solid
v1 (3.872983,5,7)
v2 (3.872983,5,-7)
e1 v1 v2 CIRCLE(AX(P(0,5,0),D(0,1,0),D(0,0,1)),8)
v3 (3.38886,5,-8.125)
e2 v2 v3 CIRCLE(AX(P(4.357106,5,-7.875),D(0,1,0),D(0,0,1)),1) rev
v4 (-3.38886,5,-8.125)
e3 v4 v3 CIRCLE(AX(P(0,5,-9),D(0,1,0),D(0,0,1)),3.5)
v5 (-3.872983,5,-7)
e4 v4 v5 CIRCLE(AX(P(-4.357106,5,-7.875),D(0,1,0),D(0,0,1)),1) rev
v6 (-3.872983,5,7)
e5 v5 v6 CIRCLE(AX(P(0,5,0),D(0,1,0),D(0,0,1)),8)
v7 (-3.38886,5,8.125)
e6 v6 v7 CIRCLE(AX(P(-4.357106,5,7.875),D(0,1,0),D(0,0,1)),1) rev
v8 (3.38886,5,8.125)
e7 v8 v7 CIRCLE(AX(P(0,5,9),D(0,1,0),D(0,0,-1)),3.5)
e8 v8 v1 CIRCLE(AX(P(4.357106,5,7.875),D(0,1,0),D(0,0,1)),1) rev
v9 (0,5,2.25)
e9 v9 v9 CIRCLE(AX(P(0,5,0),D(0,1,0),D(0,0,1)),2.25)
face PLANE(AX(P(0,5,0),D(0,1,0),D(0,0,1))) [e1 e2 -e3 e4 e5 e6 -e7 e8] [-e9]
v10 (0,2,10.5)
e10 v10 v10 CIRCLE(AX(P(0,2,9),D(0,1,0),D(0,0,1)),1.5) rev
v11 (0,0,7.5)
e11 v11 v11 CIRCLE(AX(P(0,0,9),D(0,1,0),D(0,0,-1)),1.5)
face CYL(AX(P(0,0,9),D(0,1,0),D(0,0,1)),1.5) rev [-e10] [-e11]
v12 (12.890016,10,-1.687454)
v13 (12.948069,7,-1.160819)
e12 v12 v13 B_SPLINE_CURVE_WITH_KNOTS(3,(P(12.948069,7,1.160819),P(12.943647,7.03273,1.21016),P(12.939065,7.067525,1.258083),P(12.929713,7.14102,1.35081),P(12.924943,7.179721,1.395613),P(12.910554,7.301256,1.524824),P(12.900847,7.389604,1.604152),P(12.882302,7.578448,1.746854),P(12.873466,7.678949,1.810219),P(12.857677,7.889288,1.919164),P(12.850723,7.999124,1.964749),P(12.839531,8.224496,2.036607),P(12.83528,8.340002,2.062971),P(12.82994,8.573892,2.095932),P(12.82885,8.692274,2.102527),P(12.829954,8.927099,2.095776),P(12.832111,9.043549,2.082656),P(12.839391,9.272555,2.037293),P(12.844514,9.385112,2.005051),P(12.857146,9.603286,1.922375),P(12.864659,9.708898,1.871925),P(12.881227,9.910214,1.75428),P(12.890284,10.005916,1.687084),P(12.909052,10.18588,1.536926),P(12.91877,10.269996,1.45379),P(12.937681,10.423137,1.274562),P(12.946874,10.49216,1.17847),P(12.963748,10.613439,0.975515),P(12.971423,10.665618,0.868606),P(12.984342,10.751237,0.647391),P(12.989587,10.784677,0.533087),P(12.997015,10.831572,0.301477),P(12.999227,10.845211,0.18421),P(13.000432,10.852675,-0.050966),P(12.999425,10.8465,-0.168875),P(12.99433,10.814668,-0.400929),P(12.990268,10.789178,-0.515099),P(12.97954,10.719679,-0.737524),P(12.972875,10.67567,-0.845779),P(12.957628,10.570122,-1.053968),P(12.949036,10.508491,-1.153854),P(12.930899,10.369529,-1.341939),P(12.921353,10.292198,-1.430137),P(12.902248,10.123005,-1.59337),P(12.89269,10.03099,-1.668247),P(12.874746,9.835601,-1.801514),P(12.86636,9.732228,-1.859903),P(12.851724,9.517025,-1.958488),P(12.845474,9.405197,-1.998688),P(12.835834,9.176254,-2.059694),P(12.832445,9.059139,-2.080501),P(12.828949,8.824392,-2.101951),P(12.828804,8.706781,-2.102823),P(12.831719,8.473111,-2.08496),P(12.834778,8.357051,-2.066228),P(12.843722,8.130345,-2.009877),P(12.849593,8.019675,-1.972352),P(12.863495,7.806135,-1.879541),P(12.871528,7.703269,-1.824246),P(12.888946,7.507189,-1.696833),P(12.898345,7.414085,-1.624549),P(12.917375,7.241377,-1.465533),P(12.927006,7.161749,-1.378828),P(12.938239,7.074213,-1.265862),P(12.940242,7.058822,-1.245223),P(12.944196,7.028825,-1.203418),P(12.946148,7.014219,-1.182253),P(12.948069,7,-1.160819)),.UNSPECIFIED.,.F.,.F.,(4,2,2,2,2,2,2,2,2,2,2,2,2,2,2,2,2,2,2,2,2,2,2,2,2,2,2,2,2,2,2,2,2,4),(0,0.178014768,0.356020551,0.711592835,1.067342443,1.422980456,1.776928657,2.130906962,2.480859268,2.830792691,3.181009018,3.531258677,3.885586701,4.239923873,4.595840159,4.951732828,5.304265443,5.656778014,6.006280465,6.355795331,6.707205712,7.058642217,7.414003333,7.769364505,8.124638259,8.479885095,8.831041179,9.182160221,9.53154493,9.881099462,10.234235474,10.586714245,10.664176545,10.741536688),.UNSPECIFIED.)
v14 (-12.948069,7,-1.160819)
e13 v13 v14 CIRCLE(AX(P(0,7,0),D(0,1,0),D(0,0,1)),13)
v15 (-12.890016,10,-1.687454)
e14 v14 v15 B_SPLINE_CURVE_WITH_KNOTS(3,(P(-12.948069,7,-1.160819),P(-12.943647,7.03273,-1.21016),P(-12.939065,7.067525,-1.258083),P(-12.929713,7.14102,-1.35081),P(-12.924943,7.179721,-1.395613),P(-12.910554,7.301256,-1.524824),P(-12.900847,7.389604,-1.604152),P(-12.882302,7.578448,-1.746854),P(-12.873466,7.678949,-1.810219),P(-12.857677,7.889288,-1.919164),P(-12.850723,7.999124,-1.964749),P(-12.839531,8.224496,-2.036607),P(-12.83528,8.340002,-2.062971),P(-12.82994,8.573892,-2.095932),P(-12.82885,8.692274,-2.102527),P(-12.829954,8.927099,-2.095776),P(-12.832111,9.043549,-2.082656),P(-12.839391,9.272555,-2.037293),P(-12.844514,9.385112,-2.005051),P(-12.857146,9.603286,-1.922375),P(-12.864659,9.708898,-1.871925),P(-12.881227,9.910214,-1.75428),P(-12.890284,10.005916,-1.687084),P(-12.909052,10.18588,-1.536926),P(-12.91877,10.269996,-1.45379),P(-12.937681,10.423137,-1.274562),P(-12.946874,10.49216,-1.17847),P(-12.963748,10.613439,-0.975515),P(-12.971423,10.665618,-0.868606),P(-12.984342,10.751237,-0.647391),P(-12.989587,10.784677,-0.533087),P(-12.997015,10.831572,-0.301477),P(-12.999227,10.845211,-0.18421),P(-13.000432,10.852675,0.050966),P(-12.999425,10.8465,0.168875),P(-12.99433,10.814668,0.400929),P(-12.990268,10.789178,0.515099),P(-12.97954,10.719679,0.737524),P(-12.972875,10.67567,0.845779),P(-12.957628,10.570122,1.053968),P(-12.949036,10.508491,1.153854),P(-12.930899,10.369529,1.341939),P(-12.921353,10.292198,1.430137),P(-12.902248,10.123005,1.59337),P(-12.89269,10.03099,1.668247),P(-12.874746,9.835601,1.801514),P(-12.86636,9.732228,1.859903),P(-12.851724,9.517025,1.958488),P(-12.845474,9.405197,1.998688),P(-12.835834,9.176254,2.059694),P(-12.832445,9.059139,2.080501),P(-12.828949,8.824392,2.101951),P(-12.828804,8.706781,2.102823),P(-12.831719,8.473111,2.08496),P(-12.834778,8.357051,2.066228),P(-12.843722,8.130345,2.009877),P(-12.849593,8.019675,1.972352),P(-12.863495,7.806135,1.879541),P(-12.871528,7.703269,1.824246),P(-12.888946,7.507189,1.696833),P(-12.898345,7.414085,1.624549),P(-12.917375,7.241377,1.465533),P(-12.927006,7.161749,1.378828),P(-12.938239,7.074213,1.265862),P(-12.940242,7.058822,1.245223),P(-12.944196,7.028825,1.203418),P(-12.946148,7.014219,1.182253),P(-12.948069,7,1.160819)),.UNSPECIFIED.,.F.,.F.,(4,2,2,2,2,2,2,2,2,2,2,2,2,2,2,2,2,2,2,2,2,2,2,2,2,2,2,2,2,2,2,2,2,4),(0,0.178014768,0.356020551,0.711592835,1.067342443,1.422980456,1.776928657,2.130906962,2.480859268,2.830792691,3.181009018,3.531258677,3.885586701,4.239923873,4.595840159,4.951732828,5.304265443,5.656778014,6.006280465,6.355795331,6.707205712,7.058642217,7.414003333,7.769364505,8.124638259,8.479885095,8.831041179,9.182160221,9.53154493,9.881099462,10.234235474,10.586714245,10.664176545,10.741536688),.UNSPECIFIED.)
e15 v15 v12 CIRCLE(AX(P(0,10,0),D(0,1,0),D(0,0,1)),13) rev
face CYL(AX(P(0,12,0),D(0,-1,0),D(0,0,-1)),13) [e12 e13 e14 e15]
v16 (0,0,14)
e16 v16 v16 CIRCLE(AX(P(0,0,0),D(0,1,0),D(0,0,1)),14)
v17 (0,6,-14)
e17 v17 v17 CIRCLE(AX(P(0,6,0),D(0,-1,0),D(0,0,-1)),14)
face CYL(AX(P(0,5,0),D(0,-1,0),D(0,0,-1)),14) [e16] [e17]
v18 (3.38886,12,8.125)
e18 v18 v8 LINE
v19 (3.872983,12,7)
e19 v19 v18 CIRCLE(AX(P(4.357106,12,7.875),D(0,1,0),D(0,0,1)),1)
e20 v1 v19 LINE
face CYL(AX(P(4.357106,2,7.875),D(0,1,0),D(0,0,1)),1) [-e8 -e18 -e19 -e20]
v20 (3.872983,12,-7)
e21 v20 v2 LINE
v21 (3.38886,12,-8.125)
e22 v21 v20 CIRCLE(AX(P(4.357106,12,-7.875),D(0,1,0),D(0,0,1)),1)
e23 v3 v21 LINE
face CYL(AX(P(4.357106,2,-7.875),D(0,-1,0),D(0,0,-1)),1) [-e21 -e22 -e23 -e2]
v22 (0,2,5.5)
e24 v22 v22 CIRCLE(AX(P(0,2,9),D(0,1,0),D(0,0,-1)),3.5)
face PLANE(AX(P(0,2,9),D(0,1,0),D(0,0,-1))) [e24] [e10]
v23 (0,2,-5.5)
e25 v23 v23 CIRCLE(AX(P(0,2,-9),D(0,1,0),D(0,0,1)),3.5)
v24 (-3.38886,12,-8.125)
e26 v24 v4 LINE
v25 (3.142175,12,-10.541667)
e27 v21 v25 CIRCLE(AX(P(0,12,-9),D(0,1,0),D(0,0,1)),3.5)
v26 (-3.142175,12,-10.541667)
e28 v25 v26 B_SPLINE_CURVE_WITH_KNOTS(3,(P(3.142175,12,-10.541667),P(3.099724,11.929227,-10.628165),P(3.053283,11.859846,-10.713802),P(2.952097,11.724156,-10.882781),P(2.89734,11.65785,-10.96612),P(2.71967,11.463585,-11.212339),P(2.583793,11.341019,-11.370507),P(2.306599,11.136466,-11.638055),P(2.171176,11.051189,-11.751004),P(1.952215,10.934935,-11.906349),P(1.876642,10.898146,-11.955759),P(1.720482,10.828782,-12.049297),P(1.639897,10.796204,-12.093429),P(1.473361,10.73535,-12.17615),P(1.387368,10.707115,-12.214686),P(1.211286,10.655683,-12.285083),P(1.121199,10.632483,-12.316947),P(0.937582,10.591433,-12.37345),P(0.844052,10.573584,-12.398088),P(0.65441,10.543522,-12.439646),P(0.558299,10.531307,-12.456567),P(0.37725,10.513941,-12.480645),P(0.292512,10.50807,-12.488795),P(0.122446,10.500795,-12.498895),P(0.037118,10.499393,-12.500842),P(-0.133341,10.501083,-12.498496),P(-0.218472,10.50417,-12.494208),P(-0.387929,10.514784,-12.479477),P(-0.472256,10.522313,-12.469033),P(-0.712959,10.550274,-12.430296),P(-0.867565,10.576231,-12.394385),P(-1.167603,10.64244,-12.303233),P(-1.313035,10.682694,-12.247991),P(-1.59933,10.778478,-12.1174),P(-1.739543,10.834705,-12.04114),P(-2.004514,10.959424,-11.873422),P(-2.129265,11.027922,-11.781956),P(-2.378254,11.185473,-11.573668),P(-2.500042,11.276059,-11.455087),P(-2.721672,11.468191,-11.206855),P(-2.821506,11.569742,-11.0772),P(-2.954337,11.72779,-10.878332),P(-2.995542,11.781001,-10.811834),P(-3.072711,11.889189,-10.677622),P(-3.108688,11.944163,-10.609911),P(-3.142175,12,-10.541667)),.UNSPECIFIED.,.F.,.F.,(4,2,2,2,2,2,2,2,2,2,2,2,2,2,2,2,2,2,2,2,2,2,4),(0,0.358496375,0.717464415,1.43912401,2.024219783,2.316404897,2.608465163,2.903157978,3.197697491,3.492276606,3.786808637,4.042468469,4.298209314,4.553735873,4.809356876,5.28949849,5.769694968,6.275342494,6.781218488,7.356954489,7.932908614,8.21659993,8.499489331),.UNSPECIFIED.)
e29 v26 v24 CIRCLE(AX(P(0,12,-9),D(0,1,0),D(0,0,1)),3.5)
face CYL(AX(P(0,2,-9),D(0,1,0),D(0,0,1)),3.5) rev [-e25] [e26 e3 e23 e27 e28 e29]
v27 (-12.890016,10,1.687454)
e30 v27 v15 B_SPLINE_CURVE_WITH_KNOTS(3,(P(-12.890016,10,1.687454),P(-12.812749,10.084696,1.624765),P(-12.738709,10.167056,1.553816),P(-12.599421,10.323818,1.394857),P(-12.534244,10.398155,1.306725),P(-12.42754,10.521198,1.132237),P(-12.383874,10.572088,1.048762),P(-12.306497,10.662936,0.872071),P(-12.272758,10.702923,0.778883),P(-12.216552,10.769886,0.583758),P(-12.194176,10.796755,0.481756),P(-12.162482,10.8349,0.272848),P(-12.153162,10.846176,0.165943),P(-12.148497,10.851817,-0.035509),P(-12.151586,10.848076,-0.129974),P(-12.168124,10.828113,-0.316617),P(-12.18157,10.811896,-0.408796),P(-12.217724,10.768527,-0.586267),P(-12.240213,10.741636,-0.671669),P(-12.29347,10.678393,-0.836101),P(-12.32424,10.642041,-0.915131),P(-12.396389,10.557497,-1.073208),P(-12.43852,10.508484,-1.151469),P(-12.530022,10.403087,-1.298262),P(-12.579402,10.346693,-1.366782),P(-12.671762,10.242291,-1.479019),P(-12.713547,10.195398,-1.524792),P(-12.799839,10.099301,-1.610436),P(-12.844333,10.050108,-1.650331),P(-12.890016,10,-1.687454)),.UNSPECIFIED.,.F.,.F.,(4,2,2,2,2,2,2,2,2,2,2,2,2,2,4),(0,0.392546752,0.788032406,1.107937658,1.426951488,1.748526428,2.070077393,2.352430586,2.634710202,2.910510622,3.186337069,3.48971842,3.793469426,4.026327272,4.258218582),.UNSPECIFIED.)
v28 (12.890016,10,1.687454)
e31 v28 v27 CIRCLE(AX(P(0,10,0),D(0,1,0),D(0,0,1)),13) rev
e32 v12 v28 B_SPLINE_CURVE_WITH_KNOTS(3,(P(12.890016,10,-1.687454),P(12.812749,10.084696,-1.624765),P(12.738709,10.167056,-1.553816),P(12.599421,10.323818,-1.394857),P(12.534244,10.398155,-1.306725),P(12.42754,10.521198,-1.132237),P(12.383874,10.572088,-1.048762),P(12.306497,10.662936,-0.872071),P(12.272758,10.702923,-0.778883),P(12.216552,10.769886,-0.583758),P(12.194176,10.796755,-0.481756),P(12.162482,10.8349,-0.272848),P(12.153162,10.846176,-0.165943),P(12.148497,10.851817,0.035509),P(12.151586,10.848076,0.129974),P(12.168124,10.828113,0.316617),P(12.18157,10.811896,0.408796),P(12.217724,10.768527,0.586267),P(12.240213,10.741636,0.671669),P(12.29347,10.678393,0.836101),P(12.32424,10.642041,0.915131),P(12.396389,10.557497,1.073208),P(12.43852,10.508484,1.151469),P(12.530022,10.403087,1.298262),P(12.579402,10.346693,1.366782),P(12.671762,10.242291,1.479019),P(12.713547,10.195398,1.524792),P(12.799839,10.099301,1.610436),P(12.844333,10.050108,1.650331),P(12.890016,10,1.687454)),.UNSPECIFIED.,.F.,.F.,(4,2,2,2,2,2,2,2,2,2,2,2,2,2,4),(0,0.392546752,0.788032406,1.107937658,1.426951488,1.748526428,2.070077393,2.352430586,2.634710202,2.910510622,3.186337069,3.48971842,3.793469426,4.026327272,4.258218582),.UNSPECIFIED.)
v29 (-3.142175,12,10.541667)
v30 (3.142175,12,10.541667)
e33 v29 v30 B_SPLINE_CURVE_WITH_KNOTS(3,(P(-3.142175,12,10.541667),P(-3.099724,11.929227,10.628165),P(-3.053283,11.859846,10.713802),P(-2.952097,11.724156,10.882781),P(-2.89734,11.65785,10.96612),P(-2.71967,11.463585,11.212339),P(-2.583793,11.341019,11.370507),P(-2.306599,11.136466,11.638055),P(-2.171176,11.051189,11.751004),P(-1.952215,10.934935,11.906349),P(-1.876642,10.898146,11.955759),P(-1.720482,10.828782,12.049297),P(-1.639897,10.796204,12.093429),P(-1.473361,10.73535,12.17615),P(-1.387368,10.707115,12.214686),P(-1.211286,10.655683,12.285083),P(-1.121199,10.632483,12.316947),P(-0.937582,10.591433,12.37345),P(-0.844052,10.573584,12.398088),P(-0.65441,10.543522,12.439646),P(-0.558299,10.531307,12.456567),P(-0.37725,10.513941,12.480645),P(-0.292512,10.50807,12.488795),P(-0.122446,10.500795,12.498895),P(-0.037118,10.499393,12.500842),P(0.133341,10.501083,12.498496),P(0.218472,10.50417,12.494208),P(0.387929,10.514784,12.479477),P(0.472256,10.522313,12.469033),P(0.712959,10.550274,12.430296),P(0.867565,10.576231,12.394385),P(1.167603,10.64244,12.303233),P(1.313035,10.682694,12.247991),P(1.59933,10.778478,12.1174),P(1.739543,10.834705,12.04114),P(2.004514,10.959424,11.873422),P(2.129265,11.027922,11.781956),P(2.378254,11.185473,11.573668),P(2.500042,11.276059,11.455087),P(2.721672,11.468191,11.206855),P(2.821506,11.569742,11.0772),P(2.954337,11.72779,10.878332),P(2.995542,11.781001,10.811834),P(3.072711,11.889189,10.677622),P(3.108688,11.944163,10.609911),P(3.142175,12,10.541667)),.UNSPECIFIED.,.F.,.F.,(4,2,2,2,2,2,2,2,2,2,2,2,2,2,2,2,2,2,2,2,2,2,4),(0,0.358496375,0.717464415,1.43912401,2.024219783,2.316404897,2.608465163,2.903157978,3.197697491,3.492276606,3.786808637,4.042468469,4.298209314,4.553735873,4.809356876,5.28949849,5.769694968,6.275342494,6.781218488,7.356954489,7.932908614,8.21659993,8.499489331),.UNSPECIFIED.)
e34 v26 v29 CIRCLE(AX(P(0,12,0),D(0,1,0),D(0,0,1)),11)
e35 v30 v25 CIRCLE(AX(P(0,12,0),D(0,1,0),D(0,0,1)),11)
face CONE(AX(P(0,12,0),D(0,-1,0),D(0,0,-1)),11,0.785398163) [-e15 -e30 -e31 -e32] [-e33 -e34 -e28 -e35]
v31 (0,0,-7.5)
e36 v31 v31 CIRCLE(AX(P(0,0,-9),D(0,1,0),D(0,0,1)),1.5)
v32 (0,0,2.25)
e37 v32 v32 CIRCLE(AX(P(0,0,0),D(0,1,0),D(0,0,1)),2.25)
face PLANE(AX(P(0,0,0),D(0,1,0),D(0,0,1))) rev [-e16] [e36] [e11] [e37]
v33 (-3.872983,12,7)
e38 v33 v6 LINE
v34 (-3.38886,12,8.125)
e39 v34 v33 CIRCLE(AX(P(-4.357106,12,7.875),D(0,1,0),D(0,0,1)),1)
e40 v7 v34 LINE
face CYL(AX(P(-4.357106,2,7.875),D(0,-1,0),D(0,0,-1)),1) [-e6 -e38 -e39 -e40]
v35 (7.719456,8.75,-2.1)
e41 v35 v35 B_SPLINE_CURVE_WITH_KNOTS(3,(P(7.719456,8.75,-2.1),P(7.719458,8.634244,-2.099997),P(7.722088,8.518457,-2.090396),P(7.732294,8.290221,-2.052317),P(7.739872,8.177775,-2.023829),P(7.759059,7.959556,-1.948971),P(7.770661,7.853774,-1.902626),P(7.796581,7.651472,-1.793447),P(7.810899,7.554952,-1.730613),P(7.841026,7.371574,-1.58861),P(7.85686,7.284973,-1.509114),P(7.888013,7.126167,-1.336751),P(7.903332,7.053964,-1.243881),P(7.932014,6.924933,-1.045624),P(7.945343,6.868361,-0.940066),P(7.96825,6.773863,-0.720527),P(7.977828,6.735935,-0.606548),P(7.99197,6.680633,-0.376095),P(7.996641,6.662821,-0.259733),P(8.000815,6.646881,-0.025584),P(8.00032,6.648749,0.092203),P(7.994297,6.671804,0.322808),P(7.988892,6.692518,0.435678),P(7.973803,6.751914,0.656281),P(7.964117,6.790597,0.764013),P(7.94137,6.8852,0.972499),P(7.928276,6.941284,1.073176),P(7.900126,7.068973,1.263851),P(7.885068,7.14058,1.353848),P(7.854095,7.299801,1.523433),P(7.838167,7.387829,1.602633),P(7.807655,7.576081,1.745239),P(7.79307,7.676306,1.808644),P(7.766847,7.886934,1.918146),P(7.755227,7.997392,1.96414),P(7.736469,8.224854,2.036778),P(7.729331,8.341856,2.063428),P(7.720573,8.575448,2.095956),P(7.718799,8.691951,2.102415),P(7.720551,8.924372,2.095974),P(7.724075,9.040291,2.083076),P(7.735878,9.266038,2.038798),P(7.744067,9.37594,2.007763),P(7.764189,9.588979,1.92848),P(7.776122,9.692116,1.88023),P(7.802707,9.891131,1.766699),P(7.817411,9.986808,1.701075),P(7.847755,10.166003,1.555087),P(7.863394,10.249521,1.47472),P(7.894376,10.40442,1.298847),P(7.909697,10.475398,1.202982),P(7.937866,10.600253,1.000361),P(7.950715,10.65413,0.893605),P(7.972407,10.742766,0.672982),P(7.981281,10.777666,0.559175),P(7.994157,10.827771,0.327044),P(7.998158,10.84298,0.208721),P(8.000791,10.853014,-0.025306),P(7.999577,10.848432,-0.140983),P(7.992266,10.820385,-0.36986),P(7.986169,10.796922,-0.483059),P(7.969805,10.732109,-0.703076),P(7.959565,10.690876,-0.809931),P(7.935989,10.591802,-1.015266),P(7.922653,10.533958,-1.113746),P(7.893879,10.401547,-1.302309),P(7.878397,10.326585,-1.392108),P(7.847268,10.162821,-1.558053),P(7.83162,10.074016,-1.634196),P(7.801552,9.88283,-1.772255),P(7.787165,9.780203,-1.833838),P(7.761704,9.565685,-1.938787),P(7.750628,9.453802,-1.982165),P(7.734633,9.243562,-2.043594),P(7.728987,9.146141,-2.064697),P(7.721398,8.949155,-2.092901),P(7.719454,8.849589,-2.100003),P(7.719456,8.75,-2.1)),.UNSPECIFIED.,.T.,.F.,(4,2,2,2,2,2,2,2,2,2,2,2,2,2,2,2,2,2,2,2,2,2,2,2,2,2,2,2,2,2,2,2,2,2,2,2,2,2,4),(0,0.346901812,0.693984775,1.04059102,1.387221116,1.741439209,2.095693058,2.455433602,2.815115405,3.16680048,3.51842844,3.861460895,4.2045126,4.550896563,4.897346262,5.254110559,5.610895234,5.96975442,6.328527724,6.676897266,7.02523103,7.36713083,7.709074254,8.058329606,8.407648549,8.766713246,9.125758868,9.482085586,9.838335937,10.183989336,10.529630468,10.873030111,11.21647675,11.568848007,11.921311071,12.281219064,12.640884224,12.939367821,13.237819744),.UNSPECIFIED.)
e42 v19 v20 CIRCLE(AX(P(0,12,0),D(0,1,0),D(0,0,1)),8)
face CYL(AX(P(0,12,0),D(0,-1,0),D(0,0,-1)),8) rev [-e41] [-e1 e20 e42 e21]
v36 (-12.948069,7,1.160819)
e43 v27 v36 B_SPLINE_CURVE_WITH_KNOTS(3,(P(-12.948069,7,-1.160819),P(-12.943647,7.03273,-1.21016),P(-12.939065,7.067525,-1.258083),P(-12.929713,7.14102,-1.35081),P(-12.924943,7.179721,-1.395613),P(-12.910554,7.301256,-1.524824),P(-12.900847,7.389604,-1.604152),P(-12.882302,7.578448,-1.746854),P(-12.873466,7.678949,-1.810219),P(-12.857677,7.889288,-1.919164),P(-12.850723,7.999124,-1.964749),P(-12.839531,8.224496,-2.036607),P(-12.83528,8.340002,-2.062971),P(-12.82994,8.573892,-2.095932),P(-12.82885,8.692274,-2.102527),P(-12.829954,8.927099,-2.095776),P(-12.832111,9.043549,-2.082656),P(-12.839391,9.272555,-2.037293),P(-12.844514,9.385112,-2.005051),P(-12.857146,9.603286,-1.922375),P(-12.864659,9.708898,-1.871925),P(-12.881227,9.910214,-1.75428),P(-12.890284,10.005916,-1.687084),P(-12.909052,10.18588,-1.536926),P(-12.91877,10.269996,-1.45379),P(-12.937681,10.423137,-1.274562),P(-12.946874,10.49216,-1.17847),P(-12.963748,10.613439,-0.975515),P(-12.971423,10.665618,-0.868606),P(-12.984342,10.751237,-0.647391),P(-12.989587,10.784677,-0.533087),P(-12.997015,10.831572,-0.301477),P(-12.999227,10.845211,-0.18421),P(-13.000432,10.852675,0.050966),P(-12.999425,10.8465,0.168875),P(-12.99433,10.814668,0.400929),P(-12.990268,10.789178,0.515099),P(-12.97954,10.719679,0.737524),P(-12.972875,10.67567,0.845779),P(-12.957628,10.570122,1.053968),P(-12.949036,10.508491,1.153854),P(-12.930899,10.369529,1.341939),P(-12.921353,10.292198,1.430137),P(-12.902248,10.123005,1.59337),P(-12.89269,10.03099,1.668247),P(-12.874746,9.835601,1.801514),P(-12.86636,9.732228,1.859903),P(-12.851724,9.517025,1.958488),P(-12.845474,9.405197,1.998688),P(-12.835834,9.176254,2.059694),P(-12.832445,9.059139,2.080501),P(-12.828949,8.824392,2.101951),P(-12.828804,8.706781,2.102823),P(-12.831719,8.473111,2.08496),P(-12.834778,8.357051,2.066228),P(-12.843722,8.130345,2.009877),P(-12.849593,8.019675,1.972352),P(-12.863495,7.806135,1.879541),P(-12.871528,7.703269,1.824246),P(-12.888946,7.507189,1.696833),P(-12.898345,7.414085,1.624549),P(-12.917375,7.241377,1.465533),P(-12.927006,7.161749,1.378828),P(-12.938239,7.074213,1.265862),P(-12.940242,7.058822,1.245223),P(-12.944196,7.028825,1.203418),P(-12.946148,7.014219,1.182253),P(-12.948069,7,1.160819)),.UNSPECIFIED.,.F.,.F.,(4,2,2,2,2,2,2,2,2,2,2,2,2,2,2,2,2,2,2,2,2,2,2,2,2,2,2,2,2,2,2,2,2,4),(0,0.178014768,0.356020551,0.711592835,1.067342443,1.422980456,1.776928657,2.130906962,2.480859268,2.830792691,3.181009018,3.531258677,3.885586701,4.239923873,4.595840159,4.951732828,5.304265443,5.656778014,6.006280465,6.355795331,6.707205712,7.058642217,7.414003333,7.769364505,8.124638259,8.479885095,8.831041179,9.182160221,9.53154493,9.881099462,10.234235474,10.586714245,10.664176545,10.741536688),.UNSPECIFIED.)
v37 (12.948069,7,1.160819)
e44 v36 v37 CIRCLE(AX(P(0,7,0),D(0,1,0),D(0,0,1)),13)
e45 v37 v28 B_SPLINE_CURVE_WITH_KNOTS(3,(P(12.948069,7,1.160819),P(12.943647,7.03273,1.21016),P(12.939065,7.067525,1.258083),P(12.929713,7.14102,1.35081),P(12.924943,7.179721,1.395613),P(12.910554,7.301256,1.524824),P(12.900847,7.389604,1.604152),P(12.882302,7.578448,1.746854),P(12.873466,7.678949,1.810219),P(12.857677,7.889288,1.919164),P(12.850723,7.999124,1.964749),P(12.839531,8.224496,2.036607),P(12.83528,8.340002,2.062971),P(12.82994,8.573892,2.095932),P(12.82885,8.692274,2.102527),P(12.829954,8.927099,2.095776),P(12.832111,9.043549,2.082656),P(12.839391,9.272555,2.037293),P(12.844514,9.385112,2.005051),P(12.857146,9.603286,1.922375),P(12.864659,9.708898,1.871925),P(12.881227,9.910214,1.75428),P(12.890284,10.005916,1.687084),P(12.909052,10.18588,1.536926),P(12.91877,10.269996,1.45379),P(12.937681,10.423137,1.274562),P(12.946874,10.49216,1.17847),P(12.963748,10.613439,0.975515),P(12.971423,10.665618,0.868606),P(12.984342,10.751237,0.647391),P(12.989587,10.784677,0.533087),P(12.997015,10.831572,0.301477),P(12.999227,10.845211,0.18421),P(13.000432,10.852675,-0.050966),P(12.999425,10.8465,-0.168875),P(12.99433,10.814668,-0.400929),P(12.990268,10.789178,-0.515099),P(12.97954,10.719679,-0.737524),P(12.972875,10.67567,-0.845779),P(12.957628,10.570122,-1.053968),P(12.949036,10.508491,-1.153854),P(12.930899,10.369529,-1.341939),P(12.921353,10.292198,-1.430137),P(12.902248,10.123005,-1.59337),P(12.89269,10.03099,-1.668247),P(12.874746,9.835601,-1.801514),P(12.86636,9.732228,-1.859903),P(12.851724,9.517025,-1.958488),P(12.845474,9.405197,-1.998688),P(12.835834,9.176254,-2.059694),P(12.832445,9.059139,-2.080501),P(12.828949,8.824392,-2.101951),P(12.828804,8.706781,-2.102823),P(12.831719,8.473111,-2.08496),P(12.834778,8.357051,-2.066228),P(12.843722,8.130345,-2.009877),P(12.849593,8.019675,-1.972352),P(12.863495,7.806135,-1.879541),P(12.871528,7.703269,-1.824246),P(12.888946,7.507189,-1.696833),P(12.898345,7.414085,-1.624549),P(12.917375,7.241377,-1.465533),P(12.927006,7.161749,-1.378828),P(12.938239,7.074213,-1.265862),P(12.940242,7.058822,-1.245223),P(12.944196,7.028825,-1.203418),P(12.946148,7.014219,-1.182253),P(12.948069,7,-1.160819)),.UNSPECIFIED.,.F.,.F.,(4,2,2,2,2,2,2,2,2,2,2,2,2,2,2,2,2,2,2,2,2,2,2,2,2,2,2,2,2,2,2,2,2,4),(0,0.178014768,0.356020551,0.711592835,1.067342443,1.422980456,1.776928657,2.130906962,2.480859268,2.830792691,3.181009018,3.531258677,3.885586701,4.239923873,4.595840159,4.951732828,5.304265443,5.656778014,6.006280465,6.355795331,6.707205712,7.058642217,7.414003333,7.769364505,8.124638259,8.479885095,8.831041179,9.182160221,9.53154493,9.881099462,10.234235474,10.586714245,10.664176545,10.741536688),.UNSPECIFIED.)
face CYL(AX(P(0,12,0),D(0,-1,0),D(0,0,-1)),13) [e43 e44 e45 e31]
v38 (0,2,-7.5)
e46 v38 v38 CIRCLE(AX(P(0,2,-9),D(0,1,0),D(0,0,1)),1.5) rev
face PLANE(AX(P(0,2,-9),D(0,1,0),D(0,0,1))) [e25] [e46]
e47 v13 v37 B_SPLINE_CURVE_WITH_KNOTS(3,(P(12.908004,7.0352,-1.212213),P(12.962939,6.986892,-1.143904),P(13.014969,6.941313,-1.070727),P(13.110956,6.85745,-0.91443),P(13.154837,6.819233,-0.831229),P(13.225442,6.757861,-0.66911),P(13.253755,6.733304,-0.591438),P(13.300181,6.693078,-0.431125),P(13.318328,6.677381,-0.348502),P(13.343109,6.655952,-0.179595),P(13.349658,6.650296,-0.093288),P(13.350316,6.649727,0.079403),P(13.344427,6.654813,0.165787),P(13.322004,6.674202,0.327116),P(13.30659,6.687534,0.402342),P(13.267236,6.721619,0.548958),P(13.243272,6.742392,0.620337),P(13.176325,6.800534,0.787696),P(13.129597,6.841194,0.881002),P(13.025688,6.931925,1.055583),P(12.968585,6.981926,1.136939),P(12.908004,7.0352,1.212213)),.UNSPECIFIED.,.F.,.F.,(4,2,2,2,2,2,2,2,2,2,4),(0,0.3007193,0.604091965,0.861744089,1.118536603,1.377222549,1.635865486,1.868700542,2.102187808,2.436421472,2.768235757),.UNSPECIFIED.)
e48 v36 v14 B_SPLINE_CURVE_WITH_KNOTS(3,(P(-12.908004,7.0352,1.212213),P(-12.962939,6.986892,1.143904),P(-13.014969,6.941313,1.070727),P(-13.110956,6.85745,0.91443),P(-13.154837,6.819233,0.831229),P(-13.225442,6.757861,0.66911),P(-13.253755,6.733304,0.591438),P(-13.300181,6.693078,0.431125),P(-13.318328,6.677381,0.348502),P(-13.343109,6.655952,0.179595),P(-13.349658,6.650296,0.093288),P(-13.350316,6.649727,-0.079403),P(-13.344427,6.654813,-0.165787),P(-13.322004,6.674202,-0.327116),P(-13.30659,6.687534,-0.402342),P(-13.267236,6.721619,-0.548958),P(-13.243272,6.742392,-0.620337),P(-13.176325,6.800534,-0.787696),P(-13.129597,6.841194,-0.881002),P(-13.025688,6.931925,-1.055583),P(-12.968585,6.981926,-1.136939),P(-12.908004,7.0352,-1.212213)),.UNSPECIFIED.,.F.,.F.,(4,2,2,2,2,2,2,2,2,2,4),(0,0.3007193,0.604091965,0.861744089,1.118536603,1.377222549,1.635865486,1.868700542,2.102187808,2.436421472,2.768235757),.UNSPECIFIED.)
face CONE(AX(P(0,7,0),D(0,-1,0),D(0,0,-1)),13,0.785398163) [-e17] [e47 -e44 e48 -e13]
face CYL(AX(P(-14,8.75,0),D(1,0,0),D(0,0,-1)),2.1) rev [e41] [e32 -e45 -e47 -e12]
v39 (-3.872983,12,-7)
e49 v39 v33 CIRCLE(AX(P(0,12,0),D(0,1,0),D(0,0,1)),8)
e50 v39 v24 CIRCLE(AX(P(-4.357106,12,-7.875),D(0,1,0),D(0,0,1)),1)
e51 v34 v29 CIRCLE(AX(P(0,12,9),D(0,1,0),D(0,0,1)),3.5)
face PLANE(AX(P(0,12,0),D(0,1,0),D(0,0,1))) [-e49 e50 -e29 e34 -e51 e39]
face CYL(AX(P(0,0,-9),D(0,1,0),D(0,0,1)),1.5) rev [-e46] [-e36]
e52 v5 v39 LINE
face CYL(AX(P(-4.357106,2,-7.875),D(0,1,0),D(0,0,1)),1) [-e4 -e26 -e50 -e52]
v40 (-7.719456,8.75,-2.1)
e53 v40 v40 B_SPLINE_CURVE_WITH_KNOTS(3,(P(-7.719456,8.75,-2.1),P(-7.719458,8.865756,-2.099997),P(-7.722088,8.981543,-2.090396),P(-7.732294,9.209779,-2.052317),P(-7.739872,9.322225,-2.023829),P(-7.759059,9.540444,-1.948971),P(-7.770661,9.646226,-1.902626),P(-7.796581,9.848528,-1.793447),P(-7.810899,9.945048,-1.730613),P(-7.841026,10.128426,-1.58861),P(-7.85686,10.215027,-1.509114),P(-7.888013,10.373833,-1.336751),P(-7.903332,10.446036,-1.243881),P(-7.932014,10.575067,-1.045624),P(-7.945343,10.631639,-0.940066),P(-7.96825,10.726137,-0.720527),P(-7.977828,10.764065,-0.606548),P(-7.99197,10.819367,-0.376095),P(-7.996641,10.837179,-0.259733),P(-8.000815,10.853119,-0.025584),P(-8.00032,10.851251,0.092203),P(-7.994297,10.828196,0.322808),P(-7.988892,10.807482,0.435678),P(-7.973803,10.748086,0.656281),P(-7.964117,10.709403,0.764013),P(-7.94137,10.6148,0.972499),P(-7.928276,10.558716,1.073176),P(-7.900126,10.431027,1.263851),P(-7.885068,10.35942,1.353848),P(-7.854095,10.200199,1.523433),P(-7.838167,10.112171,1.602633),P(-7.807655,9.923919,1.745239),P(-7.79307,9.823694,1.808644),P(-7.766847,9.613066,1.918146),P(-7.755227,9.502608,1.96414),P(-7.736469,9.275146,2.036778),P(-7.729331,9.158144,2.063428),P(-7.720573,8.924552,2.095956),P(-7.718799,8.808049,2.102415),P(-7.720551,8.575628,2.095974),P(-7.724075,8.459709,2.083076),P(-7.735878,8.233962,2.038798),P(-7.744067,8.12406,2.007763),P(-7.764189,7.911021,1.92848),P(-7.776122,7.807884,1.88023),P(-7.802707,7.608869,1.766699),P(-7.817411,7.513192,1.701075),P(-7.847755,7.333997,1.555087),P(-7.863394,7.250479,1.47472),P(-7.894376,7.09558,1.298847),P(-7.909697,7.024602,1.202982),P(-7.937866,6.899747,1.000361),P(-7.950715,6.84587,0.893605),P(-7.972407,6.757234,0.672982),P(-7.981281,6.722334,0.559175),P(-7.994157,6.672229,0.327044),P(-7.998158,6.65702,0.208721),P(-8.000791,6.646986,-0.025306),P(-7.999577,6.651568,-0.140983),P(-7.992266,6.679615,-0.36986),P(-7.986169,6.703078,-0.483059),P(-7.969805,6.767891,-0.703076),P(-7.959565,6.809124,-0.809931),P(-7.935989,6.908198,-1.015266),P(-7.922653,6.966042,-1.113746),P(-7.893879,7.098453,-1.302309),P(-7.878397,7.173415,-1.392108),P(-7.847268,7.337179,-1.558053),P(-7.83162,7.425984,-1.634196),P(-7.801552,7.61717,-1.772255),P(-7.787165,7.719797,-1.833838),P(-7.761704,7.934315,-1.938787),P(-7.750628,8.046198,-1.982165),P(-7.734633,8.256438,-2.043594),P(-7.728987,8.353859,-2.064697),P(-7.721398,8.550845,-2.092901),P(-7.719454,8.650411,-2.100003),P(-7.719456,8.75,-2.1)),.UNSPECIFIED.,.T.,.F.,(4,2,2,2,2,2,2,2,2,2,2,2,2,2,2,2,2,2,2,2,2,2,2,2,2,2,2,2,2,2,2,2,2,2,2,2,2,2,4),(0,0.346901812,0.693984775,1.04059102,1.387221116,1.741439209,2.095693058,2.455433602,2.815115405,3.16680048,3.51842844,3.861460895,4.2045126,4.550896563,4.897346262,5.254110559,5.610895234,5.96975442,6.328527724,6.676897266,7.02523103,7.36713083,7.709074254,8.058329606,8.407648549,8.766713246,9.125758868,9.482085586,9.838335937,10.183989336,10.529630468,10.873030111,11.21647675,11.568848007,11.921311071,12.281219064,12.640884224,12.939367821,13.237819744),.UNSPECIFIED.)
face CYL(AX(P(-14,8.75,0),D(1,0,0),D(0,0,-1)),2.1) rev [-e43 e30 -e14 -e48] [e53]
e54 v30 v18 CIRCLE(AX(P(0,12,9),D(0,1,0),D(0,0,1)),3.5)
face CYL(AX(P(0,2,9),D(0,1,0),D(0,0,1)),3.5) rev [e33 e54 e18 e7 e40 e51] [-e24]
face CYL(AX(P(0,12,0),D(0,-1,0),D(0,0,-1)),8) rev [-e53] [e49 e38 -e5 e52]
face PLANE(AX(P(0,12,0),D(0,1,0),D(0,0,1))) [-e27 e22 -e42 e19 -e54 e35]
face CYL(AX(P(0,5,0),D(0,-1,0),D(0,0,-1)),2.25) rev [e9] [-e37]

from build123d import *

# Parameters (mm, degrees)
SKETCH1_R               = 14
SKETCH1_R_2             = 2.25
BOSS_EXTRUDE1_DEPTH     = 5
SKETCH2_R               = 1.5
CUT_EXTRUDE1_DEPTH      = 21.420577857
SKETCH4_R               = 3.5
CUT_EXTRUDE2_DEPTH      = 3
CIRPATTERN1_COUNT       = 2
SKETCH5_R               = 13
SKETCH5_R_2             = 8
BOSS_EXTRUDE2_DEPTH     = 7
SKETCH6_R               = 3.5
CUT_EXTRUDE3_DEPTH      = 22
CHAMFER1_SIZE           = 2
FILLET1_START           = 5
FILLET1_DEPTH           = 8
CUT_EXTRUDE4_DEPTH      = 24.151673806
CUT_EXTRUDE4_DEPTH_BACK = 24.151673806
SKETCH8_R               = 2.1
CHAMFER2_SIZE           = 2


with BuildPart() as part:
    # Sketch1 → Boss-Extrude1 (new body)
    with BuildSketch(Plane(origin=(0, 0, 0), x_dir=(1, 0, 0), z_dir=(0, 1, 0))):
        with Locations(Location((0, 0, 0), (0, 0, 270))):
            Circle(SKETCH1_R)
        with Locations(Location((0, 0, 0), (0, 0, 270))):
            Circle(SKETCH1_R_2, mode=Mode.SUBTRACT)
    extrude(amount=BOSS_EXTRUDE1_DEPTH)

    # Sketch2 → Cut-Extrude1 (cut, through all)
    with BuildSketch(Plane(origin=(0, 5, 0), x_dir=(1, 0, 0), z_dir=(0, 1, 0))):
        with Locations(Location((0, 9, 0), (0, 0, 270))):
            Circle(SKETCH2_R)
    cut_extrude1 = extrude(amount=-CUT_EXTRUDE1_DEPTH, mode=Mode.SUBTRACT)

    # Sketch4 → Cut-Extrude2 (cut)
    with BuildSketch(Plane(origin=(0, 5, 0), x_dir=(1, 0, 0), z_dir=(0, 1, 0))):
        with Locations(Location((0, 9, 0), (0, 0, 270))):
            Circle(SKETCH4_R)
    cut_extrude2 = extrude(amount=-CUT_EXTRUDE2_DEPTH, mode=Mode.SUBTRACT)

    # CirPattern1: Cut-Extrude1, Cut-Extrude2 ×2 about axis
    cirpattern1_axis = Axis((0, 0, 0), (0, 1, 0))
    add([cut_extrude1.rotate(cirpattern1_axis, i * 360 / CIRPATTERN1_COUNT) for i in range(1, CIRPATTERN1_COUNT)], mode=Mode.SUBTRACT)
    add([cut_extrude2.rotate(cirpattern1_axis, i * 360 / CIRPATTERN1_COUNT) for i in range(1, CIRPATTERN1_COUNT)], mode=Mode.SUBTRACT)

    # Sketch5 → Boss-Extrude2 (add)
    with BuildSketch(Plane(origin=(0, 5, 0), x_dir=(1, 0, 0), z_dir=(0, 1, 0))):
        with Locations(Location((0, 0, 0), (0, 0, 270))):
            Circle(SKETCH5_R)
        with Locations(Location((0, 0, 0), (0, 0, 112.7982481))):
            Circle(SKETCH5_R_2, mode=Mode.SUBTRACT)
    extrude(amount=BOSS_EXTRUDE2_DEPTH)

    # Sketch6 → Cut-Extrude3 (cut, through all)
    with BuildSketch(Plane(origin=(0, 5, 0), x_dir=(1, 0, 0), z_dir=(0, 1, 0))):
        with Locations(Location((0, 9, 0), (0, 0, 270))):
            Circle(SKETCH6_R)
        with Locations(Location((0, -9, 0), (0, 0, 27.664004496))):
            Circle(SKETCH6_R)
    extrude(amount=CUT_EXTRUDE3_DEPTH, mode=Mode.SUBTRACT)

    # Chamfer1
    # the kernel refuses this chamfer: 2 mm, written as the material it adds along each edge
    with BuildSketch(Plane(origin=(0, 5, 0), x_dir=(0, 0, 1), z_dir=(-1, 0, 0))) as chamfer1_piece_1_section:
        Polygon((13 + CHAMFER1_SIZE, 0), (13, CHAMFER1_SIZE), (13, 0), align=None)
    chamfer1_piece_1 = revolve(axis=Axis((0, 5, 0), (0, 1, 0)), mode=Mode.PRIVATE)
    chamfer1_piece_1 = chamfer1_piece_1 & Plane(origin=(0, 5, 0), x_dir=(0, 0, 1), z_dir=(0, -1, 0)) * Cylinder(14, 61, mode=Mode.PRIVATE)
    add(chamfer1_piece_1)

    # Fillet1: read off the stored shape, not the designer's step
    # Fillet1 outline → Fillet1 (cut)
    with BuildSketch(Plane(origin=(0, 0, 0), x_dir=(1, 0, 0), z_dir=(0, 1, 0)).offset(FILLET1_START)):
        with BuildLine():
            ThreePointArc((3.388860428, -8.125), (3.438547611, -7.479715292), (3.872983346, -7))
            ThreePointArc((3.872983346, -7), (3.491479482, -7.197886567), (3.099899192, -7.375))
            ThreePointArc((3.099899192, -7.375), (3.265979999, -7.741677844), (3.388860428, -8.125))
        make_face()
        with BuildLine():
            ThreePointArc((3.099899192, 7.375), (3.491479482, 7.197886567), (3.872983346, 7))
            ThreePointArc((3.872983346, 7), (3.438547611, 7.479715292), (3.388860428, 8.125))
            ThreePointArc((3.388860428, 8.125), (3.265979999, 7.741677844), (3.099899192, 7.375))
        make_face()
        with BuildLine():
            ThreePointArc((-3.388860428, -8.125), (-3.265979999, -7.741677844), (-3.099899192, -7.375))
            ThreePointArc((-3.099899192, -7.375), (-3.491479482, -7.197886567), (-3.872983346, -7))
            ThreePointArc((-3.872983346, -7), (-3.438547611, -7.479715292), (-3.388860428, -8.125))
        make_face()
        with BuildLine():
            ThreePointArc((-3.872983346, 7), (-3.491479482, 7.197886567), (-3.099899192, 7.375))
            ThreePointArc((-3.099899192, 7.375), (-3.265979999, 7.741677844), (-3.388860428, 8.125))
            ThreePointArc((-3.388860428, 8.125), (-3.438547611, 7.479715292), (-3.872983346, 7))
        make_face()
    extrude(amount=FILLET1_DEPTH, mode=Mode.SUBTRACT)

    # Sketch8 → Cut-Extrude4 (cut, two sides: drawn at the far end of the back side and taken through both)
    with BuildSketch(Plane(origin=(0, 0, 0), x_dir=(0, 0, -1), z_dir=(1, 0, 0)).offset(-CUT_EXTRUDE4_DEPTH_BACK)):
        with Locations((0, 8.75)):
            Circle(SKETCH8_R)
    extrude(amount=CUT_EXTRUDE4_DEPTH + CUT_EXTRUDE4_DEPTH_BACK, mode=Mode.SUBTRACT)

    # Chamfer2
    # the kernel refuses this chamfer: 2 mm, written as the material it takes off along each edge
    with BuildSketch(Plane(origin=(0, 12, 0), x_dir=(0, 0, 1), z_dir=(-1, 0, 0))) as chamfer2_piece_1:
        Polygon((13, -CHAMFER2_SIZE), (13 - CHAMFER2_SIZE, 0), (13, 0), align=None)
    revolve(axis=Axis((0, 12, 0), (0, 1, 0)), mode=Mode.SUBTRACT)


solid = part.part
